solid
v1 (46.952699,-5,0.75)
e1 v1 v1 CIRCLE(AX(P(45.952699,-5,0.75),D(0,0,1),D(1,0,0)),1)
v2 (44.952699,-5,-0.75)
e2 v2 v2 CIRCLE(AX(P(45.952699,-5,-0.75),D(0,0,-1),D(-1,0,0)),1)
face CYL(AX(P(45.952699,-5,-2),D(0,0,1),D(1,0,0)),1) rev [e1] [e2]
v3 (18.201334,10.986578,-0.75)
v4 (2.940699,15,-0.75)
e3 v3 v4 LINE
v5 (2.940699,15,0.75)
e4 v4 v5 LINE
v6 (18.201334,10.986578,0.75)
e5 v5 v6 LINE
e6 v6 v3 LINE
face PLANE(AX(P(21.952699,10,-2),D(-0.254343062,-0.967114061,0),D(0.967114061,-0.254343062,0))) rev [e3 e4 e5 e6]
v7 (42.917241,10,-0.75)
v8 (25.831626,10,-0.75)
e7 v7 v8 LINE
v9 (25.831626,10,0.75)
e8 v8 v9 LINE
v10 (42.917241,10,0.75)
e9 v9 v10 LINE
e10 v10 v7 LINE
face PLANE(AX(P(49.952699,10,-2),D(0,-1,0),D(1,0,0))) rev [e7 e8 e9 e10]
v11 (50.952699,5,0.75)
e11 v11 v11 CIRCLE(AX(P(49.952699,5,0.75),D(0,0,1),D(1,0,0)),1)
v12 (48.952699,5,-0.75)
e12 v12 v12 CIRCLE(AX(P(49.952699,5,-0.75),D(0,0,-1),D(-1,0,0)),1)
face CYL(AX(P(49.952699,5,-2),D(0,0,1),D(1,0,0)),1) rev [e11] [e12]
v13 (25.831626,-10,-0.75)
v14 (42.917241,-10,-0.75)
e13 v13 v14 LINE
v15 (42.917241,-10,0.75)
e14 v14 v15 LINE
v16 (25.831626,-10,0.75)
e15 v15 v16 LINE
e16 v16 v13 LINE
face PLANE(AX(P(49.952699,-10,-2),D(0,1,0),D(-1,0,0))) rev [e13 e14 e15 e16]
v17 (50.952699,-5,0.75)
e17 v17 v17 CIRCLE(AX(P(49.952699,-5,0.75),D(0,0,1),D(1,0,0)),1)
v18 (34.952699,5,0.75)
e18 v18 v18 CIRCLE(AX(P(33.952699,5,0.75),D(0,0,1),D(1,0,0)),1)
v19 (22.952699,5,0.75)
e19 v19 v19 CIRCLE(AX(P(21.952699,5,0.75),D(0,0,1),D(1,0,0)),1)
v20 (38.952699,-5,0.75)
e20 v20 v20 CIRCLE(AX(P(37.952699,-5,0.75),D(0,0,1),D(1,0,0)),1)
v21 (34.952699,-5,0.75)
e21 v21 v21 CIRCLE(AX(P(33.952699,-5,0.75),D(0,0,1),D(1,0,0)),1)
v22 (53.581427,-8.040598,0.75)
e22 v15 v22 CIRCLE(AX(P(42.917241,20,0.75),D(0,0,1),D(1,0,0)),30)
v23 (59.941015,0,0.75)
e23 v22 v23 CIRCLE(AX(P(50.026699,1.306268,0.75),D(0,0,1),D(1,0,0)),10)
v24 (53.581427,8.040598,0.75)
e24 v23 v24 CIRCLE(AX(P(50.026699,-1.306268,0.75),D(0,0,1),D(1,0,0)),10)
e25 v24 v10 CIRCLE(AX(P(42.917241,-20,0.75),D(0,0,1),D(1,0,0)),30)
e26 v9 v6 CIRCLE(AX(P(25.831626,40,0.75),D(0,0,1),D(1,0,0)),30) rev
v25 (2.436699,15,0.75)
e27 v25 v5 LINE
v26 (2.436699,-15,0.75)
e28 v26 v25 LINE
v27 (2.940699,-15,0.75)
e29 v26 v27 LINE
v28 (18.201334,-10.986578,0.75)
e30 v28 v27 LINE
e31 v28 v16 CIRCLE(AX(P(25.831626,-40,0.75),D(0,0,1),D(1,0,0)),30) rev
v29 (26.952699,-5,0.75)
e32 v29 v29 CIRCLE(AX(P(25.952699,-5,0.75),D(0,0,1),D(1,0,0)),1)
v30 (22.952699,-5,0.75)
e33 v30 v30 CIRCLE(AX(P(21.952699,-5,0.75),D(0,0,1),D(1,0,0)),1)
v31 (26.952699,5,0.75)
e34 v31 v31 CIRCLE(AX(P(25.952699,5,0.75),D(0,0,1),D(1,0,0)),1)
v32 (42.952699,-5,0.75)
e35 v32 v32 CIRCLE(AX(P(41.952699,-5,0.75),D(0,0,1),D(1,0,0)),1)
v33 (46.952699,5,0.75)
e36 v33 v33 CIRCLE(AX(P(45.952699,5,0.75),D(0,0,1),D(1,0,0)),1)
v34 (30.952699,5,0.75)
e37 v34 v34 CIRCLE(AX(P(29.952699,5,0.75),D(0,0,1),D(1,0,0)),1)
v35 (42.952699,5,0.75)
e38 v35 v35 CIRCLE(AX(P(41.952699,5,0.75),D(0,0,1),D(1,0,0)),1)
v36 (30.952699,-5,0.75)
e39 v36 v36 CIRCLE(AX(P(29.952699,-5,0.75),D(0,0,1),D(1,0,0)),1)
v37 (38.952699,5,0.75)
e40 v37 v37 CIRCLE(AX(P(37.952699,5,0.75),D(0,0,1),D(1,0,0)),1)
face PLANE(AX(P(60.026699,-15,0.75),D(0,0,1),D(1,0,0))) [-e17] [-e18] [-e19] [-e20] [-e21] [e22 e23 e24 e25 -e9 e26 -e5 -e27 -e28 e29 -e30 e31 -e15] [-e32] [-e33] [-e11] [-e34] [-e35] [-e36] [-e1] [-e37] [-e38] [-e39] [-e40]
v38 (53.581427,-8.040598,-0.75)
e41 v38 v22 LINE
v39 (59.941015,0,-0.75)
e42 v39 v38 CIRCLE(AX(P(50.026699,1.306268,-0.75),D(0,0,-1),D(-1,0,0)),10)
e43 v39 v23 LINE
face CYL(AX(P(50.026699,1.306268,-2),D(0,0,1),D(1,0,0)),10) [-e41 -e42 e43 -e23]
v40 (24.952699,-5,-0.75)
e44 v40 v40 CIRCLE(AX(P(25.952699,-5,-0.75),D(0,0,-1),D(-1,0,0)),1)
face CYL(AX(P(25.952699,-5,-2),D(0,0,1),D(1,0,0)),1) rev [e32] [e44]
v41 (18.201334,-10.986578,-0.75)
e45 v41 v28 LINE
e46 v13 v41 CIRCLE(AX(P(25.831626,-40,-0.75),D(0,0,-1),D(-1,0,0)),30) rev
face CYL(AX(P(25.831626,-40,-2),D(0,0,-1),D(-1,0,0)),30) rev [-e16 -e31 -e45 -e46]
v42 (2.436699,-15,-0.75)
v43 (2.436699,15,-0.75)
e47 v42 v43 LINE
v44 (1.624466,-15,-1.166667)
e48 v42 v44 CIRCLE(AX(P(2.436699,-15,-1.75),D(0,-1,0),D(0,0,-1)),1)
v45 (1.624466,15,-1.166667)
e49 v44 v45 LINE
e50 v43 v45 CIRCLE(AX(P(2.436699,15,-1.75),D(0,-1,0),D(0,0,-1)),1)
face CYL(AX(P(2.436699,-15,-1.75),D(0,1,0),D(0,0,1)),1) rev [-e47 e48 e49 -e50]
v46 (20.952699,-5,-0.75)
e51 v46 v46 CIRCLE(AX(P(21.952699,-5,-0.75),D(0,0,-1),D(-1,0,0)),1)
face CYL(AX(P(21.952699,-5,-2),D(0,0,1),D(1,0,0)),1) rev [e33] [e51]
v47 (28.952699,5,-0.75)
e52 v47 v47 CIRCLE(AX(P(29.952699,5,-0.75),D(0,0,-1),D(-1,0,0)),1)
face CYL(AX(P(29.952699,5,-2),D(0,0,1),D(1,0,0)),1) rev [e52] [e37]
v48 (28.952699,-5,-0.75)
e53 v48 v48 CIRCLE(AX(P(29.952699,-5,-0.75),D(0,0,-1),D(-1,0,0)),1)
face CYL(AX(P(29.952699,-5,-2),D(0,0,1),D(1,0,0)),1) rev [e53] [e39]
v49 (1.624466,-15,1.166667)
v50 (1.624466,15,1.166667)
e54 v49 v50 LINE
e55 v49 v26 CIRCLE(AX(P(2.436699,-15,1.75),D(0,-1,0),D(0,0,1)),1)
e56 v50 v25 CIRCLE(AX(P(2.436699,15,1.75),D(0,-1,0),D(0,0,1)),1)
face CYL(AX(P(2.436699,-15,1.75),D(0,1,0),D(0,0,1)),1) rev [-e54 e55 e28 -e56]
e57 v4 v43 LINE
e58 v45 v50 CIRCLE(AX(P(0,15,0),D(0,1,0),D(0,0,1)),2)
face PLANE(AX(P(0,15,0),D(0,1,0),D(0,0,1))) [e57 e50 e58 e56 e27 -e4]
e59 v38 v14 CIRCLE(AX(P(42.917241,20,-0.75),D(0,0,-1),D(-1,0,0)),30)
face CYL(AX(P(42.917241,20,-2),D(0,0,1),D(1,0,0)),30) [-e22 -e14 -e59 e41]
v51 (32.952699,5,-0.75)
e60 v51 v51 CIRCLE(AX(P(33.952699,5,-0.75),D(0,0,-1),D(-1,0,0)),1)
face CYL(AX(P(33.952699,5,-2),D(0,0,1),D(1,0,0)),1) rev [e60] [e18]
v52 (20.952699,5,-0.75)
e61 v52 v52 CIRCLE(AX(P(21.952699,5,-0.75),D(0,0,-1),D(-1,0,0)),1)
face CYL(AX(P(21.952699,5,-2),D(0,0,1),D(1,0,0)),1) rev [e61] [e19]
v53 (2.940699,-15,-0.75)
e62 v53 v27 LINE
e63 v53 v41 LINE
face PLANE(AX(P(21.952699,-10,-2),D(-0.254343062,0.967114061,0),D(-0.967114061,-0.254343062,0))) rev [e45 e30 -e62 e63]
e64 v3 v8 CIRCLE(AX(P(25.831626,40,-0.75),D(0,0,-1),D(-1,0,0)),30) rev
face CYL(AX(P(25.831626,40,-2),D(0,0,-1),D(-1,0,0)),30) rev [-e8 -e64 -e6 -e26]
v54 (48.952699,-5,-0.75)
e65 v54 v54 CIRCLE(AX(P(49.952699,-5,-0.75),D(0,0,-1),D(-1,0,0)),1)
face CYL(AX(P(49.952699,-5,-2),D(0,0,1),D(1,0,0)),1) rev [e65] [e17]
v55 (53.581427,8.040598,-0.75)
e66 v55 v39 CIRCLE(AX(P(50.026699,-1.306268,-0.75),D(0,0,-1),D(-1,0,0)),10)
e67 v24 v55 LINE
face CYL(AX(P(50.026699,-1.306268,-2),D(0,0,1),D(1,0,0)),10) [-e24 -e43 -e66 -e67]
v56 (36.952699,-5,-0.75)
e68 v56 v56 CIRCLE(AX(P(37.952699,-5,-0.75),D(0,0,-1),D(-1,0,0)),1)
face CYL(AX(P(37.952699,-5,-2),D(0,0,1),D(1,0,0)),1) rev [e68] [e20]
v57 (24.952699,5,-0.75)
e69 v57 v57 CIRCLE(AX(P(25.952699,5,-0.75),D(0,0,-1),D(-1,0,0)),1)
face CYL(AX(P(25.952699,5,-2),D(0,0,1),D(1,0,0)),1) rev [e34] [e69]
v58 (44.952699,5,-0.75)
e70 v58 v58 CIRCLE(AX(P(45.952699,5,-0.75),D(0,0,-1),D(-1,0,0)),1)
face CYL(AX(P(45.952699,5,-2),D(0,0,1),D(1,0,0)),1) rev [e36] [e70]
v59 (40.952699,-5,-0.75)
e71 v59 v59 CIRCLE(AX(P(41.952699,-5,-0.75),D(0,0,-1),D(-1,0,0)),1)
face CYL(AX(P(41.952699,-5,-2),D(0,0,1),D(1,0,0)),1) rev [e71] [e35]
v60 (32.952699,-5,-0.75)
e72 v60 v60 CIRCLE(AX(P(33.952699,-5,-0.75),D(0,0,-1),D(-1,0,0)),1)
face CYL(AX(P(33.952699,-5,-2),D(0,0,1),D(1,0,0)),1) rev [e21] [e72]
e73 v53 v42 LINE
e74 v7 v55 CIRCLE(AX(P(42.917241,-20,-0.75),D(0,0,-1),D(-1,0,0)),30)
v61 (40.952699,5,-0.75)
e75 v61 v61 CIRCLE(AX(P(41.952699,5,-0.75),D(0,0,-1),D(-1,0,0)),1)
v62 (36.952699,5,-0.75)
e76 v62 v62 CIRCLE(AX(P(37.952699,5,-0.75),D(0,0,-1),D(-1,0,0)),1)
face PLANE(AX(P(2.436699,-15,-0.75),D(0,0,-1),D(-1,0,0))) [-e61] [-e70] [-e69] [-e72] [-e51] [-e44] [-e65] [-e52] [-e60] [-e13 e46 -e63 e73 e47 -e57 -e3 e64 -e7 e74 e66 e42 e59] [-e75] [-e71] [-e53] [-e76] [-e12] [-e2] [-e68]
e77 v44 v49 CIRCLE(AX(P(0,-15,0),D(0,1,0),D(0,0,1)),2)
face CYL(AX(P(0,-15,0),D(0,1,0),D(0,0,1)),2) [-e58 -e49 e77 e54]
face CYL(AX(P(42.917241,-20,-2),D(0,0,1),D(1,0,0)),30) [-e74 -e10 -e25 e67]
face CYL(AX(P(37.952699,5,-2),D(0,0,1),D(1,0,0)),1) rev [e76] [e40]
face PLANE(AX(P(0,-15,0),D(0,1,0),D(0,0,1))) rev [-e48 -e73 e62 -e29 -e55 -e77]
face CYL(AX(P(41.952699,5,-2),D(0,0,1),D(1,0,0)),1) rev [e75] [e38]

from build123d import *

# Parameters (mm, degrees)
BOSS_EXTRUDE1_DEPTH      = 15
BOSS_EXTRUDE1_DEPTH_BACK = 15
SKETCH2_R                = 1
CUT_EXTRUDE1_DEPTH       = 62.933569598
FILLET1_R                = 30
FILLET2_R                = 10


with BuildPart() as part:
    # Sketch1 → Boss-Extrude1 (new, two sides: drawn at the far end of the back side and taken through both)
    with BuildSketch(Plane(origin=(0, 0, 0), x_dir=(1, 0, 0), z_dir=(0, 1, 0)).offset(-BOSS_EXTRUDE1_DEPTH_BACK)):
        with BuildLine():
            Line((2.436698586, 0.75), (60.026698586, 0.75))
            Line((60.026698586, 0.75), (60.026698586, -0.75))
            Line((60.026698586, -0.75), (2.436698586, -0.75))
            ThreePointArc((2.436698586, -0.75), (1.980263122, -0.860243479), (1.624465724, -1.166666667))
            ThreePointArc((1.624465724, -1.166666667), (-2, 0), (1.624465724, 1.166666667))
            ThreePointArc((1.624465724, 1.166666667), (1.980263122, 0.860243479), (2.436698586, 0.75))
        make_face()
    extrude(amount=BOSS_EXTRUDE1_DEPTH + BOSS_EXTRUDE1_DEPTH_BACK)

    # Sketch2 → Cut-Extrude1 (cut, through all)
    with BuildSketch(Plane.XY.offset(0.75)):
        with Locations((49.952698586, 5)):
            Circle(SKETCH2_R)
        with Locations((45.952698586, 5)):
            Circle(SKETCH2_R)
        with Locations((41.952698586, 5)):
            Circle(SKETCH2_R)
        with Locations((37.952698586, 5)):
            Circle(SKETCH2_R)
        with Locations((33.952698586, 5)):
            Circle(SKETCH2_R)
        with Locations((29.952698586, 5)):
            Circle(SKETCH2_R)
        with Locations((25.952698586, 5)):
            Circle(SKETCH2_R)
        with Locations((21.952698586, 5)):
            Circle(SKETCH2_R)
        with Locations((45.952698586, -5)):
            Circle(SKETCH2_R)
        with Locations((41.952698586, -5)):
            Circle(SKETCH2_R)
        with Locations((37.952698586, -5)):
            Circle(SKETCH2_R)
        with Locations((33.952698586, -5)):
            Circle(SKETCH2_R)
        with Locations((29.952698586, -5)):
            Circle(SKETCH2_R)
        with Locations((25.952698586, -5)):
            Circle(SKETCH2_R)
        with Locations((21.952698586, -5)):
            Circle(SKETCH2_R)
        with Locations((49.952698586, -5)):
            Circle(SKETCH2_R)
        Polygon((49.952698586, 10), (21.952698586, 10), (2.940698586, 15), (60.026698586, 15), (60.026698586, 5), align=None)
        Polygon((49.952698586, -10), (21.952698586, -10), (2.940698586, -15), (60.026698586, -15), (60.026698586, -5), align=None)
    extrude(amount=-CUT_EXTRUDE1_DEPTH, mode=Mode.SUBTRACT)

    # Fillet1
    fillet1_edges = [part.edges().sort_by_distance(p)[0] for p in [
        (49.952698586, 10, 0),
        (21.952698586, 10, 0),
        (49.952698586, -10, 0),
        (21.952698586, -10, 0),
    ]]
    fillet(fillet1_edges, radius=FILLET1_R)

    # Fillet2
    # the kernel refuses this fillet: 10 mm, written as the material it takes off along each edge
    with BuildSketch(Plane(origin=(60.026698586, -5, 18.566207641), x_dir=(-0.9044112472912746, -0.4266618049146664, 0), z_dir=(0, 0, -1))) as fillet2_piece_1:
        with BuildLine():
            CenterArc((6.353468821, 9.970077682), FILLET2_R, 205.255895662, 69.177572528)
            Line((-2.690643652, 5.703459633), (-3.595054899, 5.276797828))
            Line((-3.595054899, 5.276797828), (-0.904411247, -0.426661805))
            Line((-0.904411247, -0.426661805), (-0.019905188, -0.999801872))
            ThreePointArc((-0.019905188, -0.999801872), (4.190379521, -1.083624989), (7.20378448, -0.997007768))
            Line((7.20378448, -0.997007768), (7.126483056, 0))
        make_face()
    extrude(amount=37.132415281, mode=Mode.SUBTRACT)
    with BuildSketch(Plane(origin=(60.026698586, 5, 18.566207641), x_dir=(0, -1, 0), z_dir=(0, 0, -1))) as fillet2_piece_2:
        with BuildLine():
            CenterArc((6.306267918, 10), FILLET2_R, 200.822427472, 69.177572528)
            Line((-3.040598123, 6.44527143), (-3.975284728, 6.089798573))
            ThreePointArc((-3.975284728, 6.089798573), (-2.767917517, 3.327484976), (-0.895739275, -0.444579747))
            Line((-0.895739275, -0.444579747), (0, -1))
            Line((0, -1), (6.306267918, -1))
            Line((6.306267918, -1), (6.306267918, 0))
        make_face()
    extrude(amount=37.132415281, mode=Mode.SUBTRACT)


solid = part.part
